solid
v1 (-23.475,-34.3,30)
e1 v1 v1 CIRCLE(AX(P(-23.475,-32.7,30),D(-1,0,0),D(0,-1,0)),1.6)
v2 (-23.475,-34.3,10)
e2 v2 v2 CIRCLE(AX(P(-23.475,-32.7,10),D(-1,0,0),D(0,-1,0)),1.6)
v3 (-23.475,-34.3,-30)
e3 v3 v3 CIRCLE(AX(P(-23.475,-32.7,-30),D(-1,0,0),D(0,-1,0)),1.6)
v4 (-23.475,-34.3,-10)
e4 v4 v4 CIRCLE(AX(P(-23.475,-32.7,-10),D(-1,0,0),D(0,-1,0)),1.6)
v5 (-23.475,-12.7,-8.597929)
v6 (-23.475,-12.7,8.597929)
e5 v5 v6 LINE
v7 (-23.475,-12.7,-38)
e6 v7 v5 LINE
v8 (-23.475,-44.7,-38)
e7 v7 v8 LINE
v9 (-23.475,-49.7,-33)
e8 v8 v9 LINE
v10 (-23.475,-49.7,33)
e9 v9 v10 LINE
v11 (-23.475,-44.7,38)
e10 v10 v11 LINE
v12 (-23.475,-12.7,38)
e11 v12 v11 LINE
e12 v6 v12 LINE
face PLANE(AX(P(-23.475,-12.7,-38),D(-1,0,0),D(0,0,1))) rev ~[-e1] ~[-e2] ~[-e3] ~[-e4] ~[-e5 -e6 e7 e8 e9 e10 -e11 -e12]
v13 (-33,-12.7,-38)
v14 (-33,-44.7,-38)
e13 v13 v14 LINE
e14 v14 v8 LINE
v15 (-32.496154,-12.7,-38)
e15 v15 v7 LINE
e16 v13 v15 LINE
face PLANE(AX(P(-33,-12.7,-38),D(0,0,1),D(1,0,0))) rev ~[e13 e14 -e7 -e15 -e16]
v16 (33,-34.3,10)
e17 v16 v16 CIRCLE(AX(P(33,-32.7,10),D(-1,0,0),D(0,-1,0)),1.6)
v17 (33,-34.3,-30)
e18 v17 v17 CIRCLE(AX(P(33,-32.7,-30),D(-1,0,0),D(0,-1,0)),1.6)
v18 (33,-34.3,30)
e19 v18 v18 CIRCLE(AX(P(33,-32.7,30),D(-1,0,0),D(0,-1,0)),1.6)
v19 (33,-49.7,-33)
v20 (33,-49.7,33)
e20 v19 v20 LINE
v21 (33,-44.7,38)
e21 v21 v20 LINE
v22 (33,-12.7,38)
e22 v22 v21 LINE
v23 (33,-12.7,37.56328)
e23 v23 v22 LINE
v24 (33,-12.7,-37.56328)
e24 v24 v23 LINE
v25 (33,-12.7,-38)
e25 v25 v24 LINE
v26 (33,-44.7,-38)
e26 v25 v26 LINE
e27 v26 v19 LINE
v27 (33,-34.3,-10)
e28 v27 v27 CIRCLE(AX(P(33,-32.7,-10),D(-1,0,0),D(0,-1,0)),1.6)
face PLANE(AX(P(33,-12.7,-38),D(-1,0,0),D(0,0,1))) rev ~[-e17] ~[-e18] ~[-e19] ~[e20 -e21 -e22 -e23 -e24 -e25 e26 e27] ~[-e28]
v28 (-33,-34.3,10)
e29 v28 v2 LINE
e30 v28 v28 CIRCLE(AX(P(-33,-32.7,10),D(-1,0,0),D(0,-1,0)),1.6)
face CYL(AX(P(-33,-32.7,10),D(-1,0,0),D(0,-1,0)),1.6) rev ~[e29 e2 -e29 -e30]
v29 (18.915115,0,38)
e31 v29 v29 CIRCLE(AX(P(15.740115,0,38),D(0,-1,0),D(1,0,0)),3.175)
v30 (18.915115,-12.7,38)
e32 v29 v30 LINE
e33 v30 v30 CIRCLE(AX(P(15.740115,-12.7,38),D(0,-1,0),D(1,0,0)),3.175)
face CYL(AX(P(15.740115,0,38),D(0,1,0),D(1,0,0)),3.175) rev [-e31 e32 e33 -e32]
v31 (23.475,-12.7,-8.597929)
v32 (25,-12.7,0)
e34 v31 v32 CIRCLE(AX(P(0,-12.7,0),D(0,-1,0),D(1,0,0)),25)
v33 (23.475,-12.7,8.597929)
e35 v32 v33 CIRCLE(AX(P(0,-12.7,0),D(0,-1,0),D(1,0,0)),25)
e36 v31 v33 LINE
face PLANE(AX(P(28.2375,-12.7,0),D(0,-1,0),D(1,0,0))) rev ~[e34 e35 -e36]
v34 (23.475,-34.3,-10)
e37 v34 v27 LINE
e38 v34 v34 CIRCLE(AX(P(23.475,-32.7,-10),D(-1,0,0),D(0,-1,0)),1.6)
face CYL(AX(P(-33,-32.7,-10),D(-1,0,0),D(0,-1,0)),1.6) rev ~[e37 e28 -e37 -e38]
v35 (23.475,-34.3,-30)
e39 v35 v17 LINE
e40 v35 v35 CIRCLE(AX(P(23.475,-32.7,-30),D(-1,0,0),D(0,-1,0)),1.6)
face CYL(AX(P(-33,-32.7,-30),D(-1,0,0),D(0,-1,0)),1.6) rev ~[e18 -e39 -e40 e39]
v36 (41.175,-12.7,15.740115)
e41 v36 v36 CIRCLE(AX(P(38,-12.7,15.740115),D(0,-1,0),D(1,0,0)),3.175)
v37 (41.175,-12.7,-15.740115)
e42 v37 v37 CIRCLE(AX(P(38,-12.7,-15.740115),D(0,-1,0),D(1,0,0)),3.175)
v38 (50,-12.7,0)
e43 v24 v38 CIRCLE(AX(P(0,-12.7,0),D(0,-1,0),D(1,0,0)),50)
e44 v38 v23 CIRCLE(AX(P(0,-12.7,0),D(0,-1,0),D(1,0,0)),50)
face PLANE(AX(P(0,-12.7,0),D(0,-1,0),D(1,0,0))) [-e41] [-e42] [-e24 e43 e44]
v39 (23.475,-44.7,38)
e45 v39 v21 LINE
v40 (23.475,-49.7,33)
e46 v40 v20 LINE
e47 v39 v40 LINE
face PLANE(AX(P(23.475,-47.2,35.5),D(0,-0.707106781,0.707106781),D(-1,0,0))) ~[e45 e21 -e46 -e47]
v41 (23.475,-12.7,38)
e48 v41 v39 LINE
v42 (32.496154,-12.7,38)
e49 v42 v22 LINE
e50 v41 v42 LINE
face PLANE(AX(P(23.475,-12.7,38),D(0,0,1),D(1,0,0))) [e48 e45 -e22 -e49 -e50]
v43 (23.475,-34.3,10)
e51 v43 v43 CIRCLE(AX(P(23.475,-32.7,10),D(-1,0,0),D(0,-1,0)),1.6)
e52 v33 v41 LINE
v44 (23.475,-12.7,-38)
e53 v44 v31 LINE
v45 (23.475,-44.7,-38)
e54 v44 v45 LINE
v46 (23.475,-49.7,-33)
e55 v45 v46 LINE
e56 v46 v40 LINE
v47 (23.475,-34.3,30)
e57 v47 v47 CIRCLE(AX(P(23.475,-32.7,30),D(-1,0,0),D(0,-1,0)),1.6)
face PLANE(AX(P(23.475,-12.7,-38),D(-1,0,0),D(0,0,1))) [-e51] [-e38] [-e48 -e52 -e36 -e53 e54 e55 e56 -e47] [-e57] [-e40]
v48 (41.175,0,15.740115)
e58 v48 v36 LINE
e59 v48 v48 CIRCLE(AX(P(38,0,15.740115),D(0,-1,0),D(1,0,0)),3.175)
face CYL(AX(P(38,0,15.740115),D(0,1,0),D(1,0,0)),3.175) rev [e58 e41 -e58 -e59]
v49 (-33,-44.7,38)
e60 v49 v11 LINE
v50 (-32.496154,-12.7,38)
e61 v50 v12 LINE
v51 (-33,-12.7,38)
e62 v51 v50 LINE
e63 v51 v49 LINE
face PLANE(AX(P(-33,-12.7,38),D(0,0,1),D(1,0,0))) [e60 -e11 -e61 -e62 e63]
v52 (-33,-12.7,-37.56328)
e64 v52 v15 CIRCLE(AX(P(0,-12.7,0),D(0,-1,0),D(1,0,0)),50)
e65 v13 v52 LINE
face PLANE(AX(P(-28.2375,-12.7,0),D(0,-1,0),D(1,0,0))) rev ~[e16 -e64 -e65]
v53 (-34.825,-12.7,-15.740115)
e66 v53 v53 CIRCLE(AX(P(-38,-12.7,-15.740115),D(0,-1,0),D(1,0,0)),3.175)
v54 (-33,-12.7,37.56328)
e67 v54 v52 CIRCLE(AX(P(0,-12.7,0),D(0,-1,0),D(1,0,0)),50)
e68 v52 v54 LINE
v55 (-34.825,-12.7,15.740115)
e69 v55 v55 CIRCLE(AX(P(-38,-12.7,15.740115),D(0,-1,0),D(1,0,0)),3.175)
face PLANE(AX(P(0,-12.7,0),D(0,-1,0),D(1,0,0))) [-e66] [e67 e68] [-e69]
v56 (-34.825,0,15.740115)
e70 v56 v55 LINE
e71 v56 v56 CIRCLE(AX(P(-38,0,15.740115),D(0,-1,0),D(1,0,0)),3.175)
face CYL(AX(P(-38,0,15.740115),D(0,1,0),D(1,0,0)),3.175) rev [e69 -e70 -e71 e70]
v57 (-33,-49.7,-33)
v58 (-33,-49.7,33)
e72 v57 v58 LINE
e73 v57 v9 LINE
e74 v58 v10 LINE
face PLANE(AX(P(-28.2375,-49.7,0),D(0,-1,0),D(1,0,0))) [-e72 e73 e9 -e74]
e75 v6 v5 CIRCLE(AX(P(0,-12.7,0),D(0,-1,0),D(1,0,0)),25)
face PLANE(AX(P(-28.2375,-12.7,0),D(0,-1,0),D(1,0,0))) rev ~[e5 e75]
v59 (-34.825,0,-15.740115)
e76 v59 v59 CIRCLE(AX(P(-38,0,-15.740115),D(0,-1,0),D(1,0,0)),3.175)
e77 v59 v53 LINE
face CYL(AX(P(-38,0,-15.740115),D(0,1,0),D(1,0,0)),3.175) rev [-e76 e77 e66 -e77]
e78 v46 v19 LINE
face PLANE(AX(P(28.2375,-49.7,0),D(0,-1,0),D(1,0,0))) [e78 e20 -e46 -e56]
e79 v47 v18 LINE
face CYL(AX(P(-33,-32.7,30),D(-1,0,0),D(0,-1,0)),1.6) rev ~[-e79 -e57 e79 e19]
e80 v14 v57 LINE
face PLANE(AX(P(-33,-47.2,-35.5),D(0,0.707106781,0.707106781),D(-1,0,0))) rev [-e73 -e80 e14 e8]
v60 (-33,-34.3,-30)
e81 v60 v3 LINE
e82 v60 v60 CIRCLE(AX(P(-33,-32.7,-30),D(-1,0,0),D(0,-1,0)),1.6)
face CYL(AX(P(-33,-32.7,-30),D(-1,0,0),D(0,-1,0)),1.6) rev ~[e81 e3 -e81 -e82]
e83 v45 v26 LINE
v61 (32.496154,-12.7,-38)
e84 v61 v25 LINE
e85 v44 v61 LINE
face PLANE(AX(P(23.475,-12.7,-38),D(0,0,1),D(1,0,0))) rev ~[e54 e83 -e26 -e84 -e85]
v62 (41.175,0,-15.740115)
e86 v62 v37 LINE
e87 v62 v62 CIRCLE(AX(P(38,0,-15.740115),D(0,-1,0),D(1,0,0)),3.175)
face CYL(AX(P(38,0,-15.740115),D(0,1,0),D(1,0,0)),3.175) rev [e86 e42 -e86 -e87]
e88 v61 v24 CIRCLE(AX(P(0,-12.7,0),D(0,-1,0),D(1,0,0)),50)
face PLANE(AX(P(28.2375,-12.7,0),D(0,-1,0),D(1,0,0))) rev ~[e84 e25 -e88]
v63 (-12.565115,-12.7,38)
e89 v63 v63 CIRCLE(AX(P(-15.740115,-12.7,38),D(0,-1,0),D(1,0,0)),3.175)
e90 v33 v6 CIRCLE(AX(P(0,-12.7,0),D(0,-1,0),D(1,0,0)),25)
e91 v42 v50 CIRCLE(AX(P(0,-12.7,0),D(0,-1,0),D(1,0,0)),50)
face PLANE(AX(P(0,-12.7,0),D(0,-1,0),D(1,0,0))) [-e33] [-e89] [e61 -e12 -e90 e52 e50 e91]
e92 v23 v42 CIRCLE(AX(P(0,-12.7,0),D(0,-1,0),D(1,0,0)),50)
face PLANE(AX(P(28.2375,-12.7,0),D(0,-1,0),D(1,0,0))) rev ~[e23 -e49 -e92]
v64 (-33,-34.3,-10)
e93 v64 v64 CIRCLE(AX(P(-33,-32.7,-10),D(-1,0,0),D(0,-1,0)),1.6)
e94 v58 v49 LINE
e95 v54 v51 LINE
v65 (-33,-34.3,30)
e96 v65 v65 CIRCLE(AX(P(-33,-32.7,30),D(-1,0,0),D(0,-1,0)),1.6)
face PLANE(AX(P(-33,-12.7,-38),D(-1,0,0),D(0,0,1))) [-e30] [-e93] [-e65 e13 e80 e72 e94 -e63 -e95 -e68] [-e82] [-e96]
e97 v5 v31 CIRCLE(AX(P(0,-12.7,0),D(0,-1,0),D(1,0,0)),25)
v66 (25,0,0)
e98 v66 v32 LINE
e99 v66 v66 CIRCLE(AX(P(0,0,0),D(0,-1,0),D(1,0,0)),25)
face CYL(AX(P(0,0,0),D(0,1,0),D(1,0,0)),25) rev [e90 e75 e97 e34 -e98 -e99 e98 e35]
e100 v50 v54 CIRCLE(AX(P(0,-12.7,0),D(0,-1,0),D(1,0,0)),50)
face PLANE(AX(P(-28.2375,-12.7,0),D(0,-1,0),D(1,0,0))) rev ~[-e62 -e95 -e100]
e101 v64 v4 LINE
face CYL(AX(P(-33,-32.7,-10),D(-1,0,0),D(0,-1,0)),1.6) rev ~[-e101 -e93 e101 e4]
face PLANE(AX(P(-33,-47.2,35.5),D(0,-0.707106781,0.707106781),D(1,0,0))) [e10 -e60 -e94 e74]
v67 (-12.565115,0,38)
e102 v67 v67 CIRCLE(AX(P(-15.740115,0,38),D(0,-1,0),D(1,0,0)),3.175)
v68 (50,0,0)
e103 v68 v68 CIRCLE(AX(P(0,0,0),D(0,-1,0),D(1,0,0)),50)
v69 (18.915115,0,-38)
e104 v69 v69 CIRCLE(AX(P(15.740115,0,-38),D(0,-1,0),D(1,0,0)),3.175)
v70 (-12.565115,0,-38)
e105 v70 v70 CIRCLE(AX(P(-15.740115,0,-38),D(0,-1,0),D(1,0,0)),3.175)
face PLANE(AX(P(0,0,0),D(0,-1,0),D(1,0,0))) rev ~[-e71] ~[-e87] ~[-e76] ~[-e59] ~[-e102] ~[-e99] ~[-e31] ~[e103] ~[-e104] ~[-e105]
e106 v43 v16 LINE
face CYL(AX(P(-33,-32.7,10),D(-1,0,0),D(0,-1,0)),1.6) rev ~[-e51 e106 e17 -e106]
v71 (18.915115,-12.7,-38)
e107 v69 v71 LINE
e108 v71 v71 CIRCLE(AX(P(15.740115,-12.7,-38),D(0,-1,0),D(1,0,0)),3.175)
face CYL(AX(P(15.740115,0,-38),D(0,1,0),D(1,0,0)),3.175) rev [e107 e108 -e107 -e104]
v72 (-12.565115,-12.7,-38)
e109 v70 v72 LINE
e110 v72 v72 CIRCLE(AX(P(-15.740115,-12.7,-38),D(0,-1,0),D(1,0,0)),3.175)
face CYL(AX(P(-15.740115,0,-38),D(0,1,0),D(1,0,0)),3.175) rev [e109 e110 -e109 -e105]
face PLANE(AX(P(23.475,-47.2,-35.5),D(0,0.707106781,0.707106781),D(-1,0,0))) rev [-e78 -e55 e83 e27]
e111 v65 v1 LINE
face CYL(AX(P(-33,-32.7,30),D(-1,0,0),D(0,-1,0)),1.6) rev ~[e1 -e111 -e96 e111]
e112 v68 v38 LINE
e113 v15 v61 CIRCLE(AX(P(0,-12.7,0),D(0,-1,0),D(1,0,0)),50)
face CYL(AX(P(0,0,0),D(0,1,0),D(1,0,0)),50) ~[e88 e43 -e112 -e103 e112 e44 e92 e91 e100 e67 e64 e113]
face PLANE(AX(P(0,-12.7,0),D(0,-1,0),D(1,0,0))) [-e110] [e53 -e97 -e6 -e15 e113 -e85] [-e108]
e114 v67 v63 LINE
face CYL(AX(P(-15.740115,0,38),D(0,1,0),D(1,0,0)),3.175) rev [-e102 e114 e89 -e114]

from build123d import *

# Parameters (mm, degrees)
F0_R     = 50
F0_R_2   = 3.175
F0_R_3   = 25
F1_DEPTH = 12.7
F2_W     = 9.525
F2_H     = 76
F3_DEPTH = 37
F4_R     = 1.6
F5_DEPTH = 83.001
F6_SIZE  = 5


# Not quite as in the source:
# - a feature names something its author has since deleted; it is built from what else it names


with BuildPart() as f1:
    # F0 (on Front) → F1 (new body)
    with BuildSketch(Plane.XZ):
        Circle(F0_R)
        with Locations((-15.7401153702, -38)):
            Circle(F0_R_2, mode=Mode.SUBTRACT)
        with Locations((-38, -15.7401153702)):
            Circle(F0_R_2, mode=Mode.SUBTRACT)
        with Locations((15.7401153702, -38)):
            Circle(F0_R_2, mode=Mode.SUBTRACT)
        with Locations((38, -15.7401153702)):
            Circle(F0_R_2, mode=Mode.SUBTRACT)
        with Locations((-38, 15.7401153702)):
            Circle(F0_R_2, mode=Mode.SUBTRACT)
        with Locations((-15.7401153702, 38)):
            Circle(F0_R_2, mode=Mode.SUBTRACT)
        Circle(F0_R_3, mode=Mode.SUBTRACT)
        with Locations((38, 15.7401153702)):
            Circle(F0_R_2, mode=Mode.SUBTRACT)
        with Locations((15.7401153702, 38)):
            Circle(F0_R_2, mode=Mode.SUBTRACT)
    extrude(amount=F1_DEPTH)

    # F2 (on face) → F3 (join)
    with BuildSketch(Plane.XZ.offset(12.7)):
        with Locations((-28.2375, 0)):
            Rectangle(F2_W, F2_H)
        with Locations((28.2375, 0)):
            Rectangle(F2_W, F2_H)
    extrude(amount=F3_DEPTH)

    # F4 (on face) → F5 (cut, through all)
    with BuildSketch(Plane(origin=(-33, 0, 0), x_dir=(0, -1, 0), z_dir=(-1, 0, 0))):
        with Locations((32.7, 30)):
            Circle(F4_R)
        with Locations((32.7, 10)):
            Circle(F4_R)
        with Locations((32.7, -10)):
            Circle(F4_R)
        with Locations((32.7, -30)):
            Circle(F4_R)
    extrude(amount=-F5_DEPTH, mode=Mode.SUBTRACT)

    # F6
    f6_edges = [f1.edges().sort_by_distance(p)[0] for p in [
        (-28.2375, -49.7, -38),
        (28.2375, -49.7, -38),
        (-28.2375, -49.7, 38),
        (28.2375, -49.7, 38),
    ]]
    chamfer(f6_edges, length=F6_SIZE)


solid = f1.part
